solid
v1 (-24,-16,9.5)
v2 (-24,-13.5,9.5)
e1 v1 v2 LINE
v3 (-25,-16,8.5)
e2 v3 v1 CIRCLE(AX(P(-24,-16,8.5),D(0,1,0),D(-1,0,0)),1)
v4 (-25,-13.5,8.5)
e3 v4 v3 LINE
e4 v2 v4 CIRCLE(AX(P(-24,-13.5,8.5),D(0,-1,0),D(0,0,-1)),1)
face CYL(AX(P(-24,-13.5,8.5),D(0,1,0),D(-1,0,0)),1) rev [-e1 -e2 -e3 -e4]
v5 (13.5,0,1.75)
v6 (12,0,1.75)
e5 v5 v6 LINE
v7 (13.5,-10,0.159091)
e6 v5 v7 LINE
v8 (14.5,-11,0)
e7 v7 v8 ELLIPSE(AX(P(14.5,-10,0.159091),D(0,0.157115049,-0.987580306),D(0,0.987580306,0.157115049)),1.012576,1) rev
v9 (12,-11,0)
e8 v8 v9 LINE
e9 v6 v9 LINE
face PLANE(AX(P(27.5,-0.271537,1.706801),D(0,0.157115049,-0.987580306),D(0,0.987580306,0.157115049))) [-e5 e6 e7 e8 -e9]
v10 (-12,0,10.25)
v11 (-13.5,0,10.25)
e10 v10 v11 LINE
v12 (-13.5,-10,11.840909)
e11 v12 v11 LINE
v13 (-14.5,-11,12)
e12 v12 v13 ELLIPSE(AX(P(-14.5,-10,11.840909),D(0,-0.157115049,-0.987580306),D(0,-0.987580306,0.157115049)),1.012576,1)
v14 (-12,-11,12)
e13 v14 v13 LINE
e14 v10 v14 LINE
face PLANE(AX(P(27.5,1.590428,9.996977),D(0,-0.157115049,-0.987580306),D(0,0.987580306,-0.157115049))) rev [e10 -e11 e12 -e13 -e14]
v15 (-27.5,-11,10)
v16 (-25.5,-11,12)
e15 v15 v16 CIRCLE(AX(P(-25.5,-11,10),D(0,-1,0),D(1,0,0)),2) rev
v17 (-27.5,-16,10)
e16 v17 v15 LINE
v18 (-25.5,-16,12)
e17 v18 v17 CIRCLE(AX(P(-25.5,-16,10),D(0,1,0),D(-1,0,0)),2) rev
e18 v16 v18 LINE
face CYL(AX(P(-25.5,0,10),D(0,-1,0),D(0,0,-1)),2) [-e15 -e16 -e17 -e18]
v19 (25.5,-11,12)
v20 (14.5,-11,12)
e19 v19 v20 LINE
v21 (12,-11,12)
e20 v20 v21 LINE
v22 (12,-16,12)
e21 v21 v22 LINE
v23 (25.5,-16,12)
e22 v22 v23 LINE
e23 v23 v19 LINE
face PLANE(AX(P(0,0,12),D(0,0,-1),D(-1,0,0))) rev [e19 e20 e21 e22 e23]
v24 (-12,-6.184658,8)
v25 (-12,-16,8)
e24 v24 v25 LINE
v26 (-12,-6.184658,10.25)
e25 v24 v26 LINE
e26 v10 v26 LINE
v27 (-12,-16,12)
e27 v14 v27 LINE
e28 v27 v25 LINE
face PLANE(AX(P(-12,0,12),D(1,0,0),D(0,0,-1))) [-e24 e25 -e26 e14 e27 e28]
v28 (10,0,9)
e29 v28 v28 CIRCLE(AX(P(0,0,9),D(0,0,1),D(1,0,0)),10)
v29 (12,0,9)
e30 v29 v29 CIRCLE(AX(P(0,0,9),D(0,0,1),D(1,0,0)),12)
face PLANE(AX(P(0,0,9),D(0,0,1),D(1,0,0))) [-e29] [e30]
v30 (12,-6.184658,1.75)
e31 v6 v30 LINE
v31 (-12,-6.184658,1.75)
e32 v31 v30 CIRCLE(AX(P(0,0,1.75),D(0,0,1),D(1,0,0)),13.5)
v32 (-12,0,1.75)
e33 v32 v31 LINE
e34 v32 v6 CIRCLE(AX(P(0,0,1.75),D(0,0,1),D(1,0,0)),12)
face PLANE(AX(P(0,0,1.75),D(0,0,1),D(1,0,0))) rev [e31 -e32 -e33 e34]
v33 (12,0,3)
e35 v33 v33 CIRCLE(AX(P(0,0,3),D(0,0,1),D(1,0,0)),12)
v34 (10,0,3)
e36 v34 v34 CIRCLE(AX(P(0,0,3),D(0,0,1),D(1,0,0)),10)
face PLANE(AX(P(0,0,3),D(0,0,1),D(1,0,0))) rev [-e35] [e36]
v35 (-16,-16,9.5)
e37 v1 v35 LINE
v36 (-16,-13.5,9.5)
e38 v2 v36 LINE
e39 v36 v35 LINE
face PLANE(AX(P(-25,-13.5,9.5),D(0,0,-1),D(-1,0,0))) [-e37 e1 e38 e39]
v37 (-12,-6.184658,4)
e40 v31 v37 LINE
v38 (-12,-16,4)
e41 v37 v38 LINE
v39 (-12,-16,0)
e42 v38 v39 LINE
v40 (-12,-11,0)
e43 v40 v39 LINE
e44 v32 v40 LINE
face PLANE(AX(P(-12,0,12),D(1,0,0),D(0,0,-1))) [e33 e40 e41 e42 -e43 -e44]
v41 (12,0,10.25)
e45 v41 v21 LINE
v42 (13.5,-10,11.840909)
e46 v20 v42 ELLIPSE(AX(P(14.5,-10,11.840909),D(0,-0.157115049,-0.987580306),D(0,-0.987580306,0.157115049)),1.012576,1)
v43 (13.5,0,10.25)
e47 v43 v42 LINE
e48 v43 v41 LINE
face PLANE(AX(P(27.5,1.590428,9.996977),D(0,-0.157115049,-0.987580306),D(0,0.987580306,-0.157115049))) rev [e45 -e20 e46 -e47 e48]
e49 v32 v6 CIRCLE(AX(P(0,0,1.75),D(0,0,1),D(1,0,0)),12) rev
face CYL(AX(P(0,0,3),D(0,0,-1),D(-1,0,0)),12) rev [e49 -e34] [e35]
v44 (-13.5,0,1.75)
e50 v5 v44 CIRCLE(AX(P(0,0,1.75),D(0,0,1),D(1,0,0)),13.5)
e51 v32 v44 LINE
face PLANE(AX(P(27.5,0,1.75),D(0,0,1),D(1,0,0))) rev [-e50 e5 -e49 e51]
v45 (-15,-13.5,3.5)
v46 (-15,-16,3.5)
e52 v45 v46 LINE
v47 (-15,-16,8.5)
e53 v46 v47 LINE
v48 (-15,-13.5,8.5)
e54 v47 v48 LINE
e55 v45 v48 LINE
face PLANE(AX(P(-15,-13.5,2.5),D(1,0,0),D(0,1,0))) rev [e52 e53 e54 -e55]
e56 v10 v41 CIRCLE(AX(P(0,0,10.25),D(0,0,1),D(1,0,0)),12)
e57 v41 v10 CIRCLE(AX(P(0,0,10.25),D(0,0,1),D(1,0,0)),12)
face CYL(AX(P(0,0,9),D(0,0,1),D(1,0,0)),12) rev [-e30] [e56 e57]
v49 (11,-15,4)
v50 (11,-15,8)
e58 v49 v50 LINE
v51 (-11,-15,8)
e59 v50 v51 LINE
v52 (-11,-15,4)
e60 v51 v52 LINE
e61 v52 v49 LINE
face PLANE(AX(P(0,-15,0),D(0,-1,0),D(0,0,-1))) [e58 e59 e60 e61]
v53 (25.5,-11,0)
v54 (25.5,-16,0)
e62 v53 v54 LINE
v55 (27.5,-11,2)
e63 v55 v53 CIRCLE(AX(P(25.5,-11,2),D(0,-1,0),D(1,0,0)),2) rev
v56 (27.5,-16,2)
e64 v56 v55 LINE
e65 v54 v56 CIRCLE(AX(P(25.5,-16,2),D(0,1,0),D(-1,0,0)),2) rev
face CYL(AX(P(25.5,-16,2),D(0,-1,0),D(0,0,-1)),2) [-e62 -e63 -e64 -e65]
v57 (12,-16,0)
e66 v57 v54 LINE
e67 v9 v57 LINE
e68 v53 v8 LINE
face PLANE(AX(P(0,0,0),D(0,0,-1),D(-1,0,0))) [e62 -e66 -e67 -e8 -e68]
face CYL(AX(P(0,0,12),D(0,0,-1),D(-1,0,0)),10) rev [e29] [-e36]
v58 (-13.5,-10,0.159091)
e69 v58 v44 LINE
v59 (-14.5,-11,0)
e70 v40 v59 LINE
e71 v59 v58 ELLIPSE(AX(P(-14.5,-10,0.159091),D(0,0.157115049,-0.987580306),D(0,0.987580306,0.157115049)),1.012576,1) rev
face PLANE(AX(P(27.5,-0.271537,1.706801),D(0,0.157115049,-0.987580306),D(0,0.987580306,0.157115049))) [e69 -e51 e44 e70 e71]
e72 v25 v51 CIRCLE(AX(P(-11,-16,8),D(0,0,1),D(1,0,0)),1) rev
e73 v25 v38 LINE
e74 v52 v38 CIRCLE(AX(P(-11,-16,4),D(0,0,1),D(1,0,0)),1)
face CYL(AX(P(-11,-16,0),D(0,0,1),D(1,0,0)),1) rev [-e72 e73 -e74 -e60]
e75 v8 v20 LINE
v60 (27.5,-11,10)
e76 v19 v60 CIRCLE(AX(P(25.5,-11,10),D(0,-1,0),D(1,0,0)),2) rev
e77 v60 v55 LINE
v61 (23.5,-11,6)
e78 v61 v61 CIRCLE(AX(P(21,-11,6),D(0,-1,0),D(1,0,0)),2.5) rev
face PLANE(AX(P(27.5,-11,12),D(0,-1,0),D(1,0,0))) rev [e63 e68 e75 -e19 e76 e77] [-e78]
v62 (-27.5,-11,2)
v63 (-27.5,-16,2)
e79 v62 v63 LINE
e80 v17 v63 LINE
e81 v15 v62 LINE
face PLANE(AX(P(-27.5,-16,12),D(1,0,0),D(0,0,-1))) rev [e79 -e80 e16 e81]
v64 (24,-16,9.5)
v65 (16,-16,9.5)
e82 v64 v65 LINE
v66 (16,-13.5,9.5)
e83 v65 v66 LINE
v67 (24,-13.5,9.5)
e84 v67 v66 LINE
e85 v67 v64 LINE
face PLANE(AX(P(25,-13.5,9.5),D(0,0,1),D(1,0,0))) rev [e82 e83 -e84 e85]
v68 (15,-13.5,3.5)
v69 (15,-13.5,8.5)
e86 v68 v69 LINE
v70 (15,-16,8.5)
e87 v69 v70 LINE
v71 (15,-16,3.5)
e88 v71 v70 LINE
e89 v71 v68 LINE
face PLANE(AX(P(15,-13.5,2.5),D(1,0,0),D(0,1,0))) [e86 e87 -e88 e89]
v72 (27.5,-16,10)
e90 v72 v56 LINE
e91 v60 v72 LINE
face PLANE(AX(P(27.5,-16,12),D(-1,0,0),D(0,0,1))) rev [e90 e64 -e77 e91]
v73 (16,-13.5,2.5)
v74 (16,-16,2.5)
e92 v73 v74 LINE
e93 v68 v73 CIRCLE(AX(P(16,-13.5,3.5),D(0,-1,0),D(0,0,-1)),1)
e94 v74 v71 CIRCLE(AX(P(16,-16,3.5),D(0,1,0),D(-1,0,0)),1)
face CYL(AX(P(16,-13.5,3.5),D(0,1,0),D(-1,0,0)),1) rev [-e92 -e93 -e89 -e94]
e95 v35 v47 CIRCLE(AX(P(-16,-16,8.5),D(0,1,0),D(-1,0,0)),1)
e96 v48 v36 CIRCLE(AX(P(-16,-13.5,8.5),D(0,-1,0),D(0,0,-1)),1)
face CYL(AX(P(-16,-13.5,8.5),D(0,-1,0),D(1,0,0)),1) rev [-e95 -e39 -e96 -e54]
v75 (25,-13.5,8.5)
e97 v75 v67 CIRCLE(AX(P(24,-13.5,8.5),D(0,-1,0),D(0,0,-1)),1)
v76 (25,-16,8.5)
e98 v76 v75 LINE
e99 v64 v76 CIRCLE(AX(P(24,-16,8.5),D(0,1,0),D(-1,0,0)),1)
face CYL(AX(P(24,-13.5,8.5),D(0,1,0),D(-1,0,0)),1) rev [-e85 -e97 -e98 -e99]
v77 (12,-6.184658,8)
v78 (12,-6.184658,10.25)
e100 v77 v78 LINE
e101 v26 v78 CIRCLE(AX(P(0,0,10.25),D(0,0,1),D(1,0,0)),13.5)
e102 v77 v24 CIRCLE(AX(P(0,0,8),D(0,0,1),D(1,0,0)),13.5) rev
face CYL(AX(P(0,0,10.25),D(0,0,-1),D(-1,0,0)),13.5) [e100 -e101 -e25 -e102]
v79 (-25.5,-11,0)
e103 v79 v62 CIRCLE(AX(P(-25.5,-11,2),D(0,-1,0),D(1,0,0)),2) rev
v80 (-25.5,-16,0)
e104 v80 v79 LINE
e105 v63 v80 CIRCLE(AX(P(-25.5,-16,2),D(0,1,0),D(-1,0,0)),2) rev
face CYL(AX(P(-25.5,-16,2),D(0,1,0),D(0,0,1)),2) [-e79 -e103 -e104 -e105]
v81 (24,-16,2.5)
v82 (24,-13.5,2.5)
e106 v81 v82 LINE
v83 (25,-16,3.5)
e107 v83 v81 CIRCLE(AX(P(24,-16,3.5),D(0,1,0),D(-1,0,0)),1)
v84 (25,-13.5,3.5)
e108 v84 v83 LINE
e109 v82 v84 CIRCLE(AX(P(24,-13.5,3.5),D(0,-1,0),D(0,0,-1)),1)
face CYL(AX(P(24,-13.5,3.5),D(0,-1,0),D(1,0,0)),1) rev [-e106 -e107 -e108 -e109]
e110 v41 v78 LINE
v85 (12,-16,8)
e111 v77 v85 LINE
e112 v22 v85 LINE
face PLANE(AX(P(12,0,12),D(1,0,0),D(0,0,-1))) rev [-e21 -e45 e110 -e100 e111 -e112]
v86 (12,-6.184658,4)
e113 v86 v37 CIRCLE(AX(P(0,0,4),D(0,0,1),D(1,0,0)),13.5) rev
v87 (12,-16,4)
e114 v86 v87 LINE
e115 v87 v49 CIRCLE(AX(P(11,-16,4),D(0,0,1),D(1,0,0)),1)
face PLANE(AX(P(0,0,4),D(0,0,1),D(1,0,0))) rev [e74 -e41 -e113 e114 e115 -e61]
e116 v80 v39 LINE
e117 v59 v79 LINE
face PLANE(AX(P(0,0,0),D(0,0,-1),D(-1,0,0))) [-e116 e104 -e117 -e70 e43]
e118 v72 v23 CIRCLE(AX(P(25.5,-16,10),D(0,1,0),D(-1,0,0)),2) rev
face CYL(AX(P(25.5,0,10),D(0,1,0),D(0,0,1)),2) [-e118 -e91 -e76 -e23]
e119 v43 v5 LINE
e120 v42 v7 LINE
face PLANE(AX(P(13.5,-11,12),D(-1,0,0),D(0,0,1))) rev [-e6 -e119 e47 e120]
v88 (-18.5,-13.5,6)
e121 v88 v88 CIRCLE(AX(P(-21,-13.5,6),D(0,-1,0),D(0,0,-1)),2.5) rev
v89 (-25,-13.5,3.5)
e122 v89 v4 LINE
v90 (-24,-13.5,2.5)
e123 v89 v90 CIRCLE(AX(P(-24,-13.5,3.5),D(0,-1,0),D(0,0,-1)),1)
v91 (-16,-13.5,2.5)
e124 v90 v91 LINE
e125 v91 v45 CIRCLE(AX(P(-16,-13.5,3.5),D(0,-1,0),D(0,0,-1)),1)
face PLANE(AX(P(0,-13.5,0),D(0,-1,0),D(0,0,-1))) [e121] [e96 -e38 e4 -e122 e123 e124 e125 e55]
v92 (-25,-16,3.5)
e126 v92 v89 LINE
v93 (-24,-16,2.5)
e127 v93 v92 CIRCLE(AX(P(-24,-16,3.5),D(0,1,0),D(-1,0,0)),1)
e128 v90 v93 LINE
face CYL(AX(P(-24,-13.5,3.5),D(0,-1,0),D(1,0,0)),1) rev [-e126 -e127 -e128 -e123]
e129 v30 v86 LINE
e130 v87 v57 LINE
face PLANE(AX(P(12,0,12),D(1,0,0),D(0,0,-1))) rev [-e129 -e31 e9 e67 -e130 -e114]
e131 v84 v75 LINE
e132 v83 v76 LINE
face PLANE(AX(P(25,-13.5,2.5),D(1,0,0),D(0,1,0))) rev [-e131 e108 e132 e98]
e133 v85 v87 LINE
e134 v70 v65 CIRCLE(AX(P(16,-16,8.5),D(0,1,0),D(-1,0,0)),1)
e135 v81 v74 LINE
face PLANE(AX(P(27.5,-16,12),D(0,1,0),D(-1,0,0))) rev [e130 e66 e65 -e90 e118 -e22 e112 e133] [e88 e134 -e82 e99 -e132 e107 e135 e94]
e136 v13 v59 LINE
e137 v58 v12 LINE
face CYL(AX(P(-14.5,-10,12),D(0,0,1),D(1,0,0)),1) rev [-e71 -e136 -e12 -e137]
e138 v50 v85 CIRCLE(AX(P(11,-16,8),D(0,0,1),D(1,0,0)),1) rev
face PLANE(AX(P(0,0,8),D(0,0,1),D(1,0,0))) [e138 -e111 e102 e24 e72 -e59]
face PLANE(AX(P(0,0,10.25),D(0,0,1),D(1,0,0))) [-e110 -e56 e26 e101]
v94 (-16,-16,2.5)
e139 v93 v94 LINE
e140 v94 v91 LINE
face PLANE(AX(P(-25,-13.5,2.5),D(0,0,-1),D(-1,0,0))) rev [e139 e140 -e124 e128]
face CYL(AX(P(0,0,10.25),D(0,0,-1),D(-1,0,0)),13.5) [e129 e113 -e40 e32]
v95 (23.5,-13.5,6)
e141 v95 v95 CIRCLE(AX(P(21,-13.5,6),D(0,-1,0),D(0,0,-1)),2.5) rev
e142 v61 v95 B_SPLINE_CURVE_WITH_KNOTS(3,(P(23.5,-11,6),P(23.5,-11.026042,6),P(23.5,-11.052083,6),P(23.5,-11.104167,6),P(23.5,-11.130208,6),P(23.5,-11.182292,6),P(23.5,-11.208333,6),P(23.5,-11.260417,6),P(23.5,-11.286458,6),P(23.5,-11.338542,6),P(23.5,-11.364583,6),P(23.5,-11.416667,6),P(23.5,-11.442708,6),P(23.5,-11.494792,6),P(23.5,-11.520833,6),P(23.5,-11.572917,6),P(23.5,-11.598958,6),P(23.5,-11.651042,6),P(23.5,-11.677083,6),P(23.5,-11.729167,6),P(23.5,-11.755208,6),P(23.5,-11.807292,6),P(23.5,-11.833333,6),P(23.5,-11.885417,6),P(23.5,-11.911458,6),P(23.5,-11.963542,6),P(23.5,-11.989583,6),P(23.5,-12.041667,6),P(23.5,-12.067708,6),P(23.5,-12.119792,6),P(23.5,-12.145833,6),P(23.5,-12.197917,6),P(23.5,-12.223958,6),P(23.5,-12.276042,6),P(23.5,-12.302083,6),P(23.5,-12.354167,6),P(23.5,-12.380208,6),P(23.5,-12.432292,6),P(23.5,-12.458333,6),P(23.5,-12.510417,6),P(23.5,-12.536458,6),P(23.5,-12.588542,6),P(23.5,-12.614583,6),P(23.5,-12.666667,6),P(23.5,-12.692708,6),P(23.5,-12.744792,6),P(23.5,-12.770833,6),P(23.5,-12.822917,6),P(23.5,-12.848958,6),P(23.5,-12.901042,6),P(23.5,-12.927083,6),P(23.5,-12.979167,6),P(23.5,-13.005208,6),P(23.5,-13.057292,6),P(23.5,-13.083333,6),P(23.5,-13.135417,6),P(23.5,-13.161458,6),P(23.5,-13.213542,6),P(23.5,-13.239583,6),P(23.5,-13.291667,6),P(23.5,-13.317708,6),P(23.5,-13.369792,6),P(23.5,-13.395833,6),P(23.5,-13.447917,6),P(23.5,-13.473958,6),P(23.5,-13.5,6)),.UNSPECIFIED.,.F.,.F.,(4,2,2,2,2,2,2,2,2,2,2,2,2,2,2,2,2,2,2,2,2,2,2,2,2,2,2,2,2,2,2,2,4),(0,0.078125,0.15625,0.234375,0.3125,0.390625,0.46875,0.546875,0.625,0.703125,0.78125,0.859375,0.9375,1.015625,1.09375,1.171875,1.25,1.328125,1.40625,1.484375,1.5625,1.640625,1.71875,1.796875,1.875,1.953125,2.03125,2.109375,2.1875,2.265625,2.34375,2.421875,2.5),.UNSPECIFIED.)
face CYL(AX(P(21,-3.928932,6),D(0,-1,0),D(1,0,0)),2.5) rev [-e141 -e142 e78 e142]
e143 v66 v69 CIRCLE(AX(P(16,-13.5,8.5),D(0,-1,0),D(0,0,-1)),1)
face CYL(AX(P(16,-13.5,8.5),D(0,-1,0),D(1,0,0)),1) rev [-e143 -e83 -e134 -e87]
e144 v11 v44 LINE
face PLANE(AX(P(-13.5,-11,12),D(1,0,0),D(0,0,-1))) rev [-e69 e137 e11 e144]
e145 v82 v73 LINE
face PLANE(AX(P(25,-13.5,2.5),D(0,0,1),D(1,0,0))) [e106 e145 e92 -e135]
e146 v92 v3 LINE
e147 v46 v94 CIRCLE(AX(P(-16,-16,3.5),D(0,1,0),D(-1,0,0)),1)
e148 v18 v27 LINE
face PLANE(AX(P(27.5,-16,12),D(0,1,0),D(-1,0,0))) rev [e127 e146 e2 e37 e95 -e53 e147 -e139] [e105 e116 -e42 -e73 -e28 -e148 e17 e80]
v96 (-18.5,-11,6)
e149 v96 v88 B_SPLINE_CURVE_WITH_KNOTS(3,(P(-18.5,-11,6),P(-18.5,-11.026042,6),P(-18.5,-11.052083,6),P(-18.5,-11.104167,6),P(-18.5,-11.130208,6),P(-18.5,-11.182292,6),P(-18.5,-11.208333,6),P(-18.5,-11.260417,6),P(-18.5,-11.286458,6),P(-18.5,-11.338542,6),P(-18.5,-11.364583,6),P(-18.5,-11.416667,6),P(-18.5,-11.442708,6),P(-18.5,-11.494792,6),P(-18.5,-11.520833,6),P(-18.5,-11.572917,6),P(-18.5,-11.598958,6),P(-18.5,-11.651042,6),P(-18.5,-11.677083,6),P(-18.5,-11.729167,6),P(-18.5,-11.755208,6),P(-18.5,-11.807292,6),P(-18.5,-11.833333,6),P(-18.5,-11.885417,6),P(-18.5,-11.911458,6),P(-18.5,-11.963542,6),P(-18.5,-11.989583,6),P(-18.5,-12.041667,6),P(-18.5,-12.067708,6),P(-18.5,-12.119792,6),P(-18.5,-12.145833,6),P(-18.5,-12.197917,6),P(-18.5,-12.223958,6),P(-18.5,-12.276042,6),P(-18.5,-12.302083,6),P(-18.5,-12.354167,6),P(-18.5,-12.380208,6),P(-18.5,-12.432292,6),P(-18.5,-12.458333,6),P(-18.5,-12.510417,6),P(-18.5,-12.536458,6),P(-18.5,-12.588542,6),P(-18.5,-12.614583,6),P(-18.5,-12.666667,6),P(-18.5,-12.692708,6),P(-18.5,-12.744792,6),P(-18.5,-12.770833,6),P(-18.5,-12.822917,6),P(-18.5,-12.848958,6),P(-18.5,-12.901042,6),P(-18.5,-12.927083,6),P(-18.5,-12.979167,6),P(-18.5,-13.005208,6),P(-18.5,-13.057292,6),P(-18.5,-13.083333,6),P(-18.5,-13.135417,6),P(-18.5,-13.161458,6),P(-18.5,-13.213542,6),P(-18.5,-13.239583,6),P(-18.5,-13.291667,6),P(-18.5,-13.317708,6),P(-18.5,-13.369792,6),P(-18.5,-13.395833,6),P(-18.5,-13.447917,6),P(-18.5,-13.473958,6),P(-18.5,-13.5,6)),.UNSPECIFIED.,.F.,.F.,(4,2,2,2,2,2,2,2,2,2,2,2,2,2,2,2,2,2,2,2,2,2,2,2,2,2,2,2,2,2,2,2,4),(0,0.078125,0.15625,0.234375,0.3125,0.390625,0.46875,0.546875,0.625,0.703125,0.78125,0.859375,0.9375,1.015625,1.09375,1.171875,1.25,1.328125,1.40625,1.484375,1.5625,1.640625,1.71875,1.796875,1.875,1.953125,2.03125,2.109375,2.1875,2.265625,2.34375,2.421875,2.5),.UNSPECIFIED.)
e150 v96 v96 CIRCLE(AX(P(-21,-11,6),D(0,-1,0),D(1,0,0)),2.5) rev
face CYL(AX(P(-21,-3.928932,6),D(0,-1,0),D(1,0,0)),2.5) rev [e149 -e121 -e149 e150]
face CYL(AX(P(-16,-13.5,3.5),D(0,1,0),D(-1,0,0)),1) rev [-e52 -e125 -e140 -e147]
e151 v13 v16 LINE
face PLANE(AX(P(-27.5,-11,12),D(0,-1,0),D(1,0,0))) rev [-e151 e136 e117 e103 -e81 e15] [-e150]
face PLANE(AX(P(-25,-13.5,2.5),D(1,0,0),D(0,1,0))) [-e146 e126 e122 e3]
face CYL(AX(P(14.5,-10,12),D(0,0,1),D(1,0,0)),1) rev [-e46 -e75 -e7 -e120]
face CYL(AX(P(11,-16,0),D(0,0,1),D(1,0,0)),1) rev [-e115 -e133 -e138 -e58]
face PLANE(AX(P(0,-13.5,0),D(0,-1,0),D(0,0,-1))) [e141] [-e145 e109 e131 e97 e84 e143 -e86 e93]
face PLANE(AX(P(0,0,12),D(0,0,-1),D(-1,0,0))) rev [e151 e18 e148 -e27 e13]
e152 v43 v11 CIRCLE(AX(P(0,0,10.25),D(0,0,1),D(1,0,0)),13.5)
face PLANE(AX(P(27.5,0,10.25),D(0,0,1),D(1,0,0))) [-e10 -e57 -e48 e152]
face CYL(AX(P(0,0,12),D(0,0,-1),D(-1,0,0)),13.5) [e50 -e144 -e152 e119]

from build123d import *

# Parameters (mm, degrees)
SKETCH1_R           = 10
BOSS_EXTRUDE1_DEPTH = 12
CUT_EXTRUDE1_DEPTH  = 59.523499554
CUT_EXTRUDE2_START  = 8
CUT_EXTRUDE2_DEPTH  = 4
CUT_EXTRUDE3_DEPTH  = 4
BOSS_EXTRUDE2_START = 6
SKETCH4_R           = 13.5
SKETCH4_R_2         = 12
BOSS_EXTRUDE2_DEPTH = 4.25
SKETCH6_R           = 12
SKETCH6_R_2         = 10
CUT_EXTRUDE4_DEPTH  = 3
CUT_EXTRUDE5_START  = 9
SKETCH6_2_R         = 12
SKETCH6_2_R_2       = 10
CUT_EXTRUDE5_DEPTH  = 3
SKETCH7_R           = 2.5
CUT_EXTRUDE6_DEPTH  = 5
SKETCH8_W           = 10
SKETCH8_H           = 7
CUT_EXTRUDE7_DEPTH  = 2.5
SKETCH9_W           = 24
SKETCH9_H           = 4
CUT_EXTRUDE8_DEPTH  = 1
FILLET1_R           = 1
FILLET2_R           = 2
FILLET3_R           = 1


with BuildPart() as part:
    # Sketch1 → Boss-Extrude1 (new body)
    with BuildSketch(Plane.XY):
        with BuildLine():
            Line((27.5, -16), (-27.5, -16))
            Line((-27.5, -16), (-27.5, -11))
            Line((-27.5, -11), (-13.5, -11))
            Line((-13.5, -11), (-13.5, 0))
            ThreePointArc((-13.5, 0), (0, 13.5), (13.5, 0))
            Line((13.5, 0), (13.5, -11))
            Line((13.5, -11), (27.5, -11))
            Line((27.5, -11), (27.5, -16))
        make_face()
        Circle(SKETCH1_R, mode=Mode.SUBTRACT)
    extrude(amount=BOSS_EXTRUDE1_DEPTH)

    # Sketch2 → Cut-Extrude1 (cut, through all)
    with BuildSketch(Plane.ZY.offset(27.5)):
        Polygon((10.25, 0), (12, -11), (12, 13.5), (10.25, 13.5), align=None)
        Polygon((0, -11), (1.75, 0), (1.75, 13.5), (0, 13.5), align=None)
    extrude(amount=-CUT_EXTRUDE1_DEPTH, mode=Mode.SUBTRACT)

    # Sketch3 → Cut-Extrude2 (cut)
    with BuildSketch(Plane.XY.offset(CUT_EXTRUDE2_START)):
        with BuildLine():
            ThreePointArc((12, 0), (0, -12), (-12, 0))
            Line((-12, 0), (-12, -16))
            Line((-12, -16), (12, -16))
            Line((12, -16), (12, 0))
        make_face()
    extrude(amount=CUT_EXTRUDE2_DEPTH, mode=Mode.SUBTRACT)

    # Sketch3<3> → Cut-Extrude3 (cut)
    with BuildSketch(Plane.XY):
        with BuildLine():
            ThreePointArc((12, 0), (0, -12), (-12, 0))
            Line((-12, 0), (-12, -16))
            Line((-12, -16), (12, -16))
            Line((12, -16), (12, 0))
        make_face()
    extrude(amount=CUT_EXTRUDE3_DEPTH, mode=Mode.SUBTRACT)

    # Sketch4 → Boss-Extrude2 (add, symmetric)
    with BuildSketch(Plane.XY.offset(BOSS_EXTRUDE2_START)):
        Circle(SKETCH4_R)
        Circle(SKETCH4_R_2, mode=Mode.SUBTRACT)
    extrude(amount=BOSS_EXTRUDE2_DEPTH, both=True)

    # Sketch6 → Cut-Extrude4 (cut)
    with BuildSketch(Plane.XY):
        Circle(SKETCH6_R)
        Circle(SKETCH6_R_2, mode=Mode.SUBTRACT)
    extrude(amount=CUT_EXTRUDE4_DEPTH, mode=Mode.SUBTRACT)

    # Sketch6<2> → Cut-Extrude5 (cut)
    with BuildSketch(Plane.XY.offset(CUT_EXTRUDE5_START)):
        Circle(SKETCH6_2_R)
        Circle(SKETCH6_2_R_2, mode=Mode.SUBTRACT)
    extrude(amount=CUT_EXTRUDE5_DEPTH, mode=Mode.SUBTRACT)

    # Sketch7 → Cut-Extrude6 (cut)
    with BuildSketch(Plane.XZ.offset(16)):
        with Locations((-21, 6)):
            Circle(SKETCH7_R)
        with Locations((21, 6)):
            Circle(SKETCH7_R)
    extrude(amount=-CUT_EXTRUDE6_DEPTH, mode=Mode.SUBTRACT)

    # Sketch8 → Cut-Extrude7 (cut)
    with BuildSketch(Plane.XZ.offset(16)):
        with Locations((20, 6)):
            Rectangle(SKETCH8_W, SKETCH8_H)
        with Locations((-20, 6)):
            Rectangle(SKETCH8_W, SKETCH8_H)
    extrude(amount=-CUT_EXTRUDE7_DEPTH, mode=Mode.SUBTRACT)

    # Sketch9 → Cut-Extrude8 (cut)
    with BuildSketch(Plane.XZ.offset(16)):
        with Locations((0, 6)):
            Rectangle(SKETCH9_W, SKETCH9_H)
    extrude(amount=-CUT_EXTRUDE8_DEPTH, mode=Mode.SUBTRACT)

    # Fillet1
    fillet1_edges = [part.edges().sort_by_distance(p)[0] for p in [
        (13.5, -11, 6),
        (-13.5, -11, 6),
        (12, -15, 6),
        (-12, -15, 6),
    ]]
    fillet(fillet1_edges, radius=FILLET1_R - 0.0001)  # a hair under: the kernel refuses the full size

    # Fillet2
    fillet2_edges = [part.edges().sort_by_distance(p)[0] for p in [
        (-27.5, -13.5, 0),
        (-27.5, -13.5, 12),
        (27.5, -13.5, 12),
        (27.5, -13.5, 0),
    ]]
    fillet(fillet2_edges, radius=FILLET2_R)

    # Fillet3
    fillet3_edges = [part.edges().sort_by_distance(p)[0] for p in [
        (-25, -14.75, 9.5),
        (-15, -14.75, 9.5),
        (-15, -14.75, 2.5),
        (-25, -14.75, 2.5),
        (25, -14.75, 9.5),
        (25, -14.75, 2.5),
        (15, -14.75, 2.5),
        (15, -14.75, 9.5),
    ]]
    fillet(fillet3_edges, radius=FILLET3_R)


solid = part.part
